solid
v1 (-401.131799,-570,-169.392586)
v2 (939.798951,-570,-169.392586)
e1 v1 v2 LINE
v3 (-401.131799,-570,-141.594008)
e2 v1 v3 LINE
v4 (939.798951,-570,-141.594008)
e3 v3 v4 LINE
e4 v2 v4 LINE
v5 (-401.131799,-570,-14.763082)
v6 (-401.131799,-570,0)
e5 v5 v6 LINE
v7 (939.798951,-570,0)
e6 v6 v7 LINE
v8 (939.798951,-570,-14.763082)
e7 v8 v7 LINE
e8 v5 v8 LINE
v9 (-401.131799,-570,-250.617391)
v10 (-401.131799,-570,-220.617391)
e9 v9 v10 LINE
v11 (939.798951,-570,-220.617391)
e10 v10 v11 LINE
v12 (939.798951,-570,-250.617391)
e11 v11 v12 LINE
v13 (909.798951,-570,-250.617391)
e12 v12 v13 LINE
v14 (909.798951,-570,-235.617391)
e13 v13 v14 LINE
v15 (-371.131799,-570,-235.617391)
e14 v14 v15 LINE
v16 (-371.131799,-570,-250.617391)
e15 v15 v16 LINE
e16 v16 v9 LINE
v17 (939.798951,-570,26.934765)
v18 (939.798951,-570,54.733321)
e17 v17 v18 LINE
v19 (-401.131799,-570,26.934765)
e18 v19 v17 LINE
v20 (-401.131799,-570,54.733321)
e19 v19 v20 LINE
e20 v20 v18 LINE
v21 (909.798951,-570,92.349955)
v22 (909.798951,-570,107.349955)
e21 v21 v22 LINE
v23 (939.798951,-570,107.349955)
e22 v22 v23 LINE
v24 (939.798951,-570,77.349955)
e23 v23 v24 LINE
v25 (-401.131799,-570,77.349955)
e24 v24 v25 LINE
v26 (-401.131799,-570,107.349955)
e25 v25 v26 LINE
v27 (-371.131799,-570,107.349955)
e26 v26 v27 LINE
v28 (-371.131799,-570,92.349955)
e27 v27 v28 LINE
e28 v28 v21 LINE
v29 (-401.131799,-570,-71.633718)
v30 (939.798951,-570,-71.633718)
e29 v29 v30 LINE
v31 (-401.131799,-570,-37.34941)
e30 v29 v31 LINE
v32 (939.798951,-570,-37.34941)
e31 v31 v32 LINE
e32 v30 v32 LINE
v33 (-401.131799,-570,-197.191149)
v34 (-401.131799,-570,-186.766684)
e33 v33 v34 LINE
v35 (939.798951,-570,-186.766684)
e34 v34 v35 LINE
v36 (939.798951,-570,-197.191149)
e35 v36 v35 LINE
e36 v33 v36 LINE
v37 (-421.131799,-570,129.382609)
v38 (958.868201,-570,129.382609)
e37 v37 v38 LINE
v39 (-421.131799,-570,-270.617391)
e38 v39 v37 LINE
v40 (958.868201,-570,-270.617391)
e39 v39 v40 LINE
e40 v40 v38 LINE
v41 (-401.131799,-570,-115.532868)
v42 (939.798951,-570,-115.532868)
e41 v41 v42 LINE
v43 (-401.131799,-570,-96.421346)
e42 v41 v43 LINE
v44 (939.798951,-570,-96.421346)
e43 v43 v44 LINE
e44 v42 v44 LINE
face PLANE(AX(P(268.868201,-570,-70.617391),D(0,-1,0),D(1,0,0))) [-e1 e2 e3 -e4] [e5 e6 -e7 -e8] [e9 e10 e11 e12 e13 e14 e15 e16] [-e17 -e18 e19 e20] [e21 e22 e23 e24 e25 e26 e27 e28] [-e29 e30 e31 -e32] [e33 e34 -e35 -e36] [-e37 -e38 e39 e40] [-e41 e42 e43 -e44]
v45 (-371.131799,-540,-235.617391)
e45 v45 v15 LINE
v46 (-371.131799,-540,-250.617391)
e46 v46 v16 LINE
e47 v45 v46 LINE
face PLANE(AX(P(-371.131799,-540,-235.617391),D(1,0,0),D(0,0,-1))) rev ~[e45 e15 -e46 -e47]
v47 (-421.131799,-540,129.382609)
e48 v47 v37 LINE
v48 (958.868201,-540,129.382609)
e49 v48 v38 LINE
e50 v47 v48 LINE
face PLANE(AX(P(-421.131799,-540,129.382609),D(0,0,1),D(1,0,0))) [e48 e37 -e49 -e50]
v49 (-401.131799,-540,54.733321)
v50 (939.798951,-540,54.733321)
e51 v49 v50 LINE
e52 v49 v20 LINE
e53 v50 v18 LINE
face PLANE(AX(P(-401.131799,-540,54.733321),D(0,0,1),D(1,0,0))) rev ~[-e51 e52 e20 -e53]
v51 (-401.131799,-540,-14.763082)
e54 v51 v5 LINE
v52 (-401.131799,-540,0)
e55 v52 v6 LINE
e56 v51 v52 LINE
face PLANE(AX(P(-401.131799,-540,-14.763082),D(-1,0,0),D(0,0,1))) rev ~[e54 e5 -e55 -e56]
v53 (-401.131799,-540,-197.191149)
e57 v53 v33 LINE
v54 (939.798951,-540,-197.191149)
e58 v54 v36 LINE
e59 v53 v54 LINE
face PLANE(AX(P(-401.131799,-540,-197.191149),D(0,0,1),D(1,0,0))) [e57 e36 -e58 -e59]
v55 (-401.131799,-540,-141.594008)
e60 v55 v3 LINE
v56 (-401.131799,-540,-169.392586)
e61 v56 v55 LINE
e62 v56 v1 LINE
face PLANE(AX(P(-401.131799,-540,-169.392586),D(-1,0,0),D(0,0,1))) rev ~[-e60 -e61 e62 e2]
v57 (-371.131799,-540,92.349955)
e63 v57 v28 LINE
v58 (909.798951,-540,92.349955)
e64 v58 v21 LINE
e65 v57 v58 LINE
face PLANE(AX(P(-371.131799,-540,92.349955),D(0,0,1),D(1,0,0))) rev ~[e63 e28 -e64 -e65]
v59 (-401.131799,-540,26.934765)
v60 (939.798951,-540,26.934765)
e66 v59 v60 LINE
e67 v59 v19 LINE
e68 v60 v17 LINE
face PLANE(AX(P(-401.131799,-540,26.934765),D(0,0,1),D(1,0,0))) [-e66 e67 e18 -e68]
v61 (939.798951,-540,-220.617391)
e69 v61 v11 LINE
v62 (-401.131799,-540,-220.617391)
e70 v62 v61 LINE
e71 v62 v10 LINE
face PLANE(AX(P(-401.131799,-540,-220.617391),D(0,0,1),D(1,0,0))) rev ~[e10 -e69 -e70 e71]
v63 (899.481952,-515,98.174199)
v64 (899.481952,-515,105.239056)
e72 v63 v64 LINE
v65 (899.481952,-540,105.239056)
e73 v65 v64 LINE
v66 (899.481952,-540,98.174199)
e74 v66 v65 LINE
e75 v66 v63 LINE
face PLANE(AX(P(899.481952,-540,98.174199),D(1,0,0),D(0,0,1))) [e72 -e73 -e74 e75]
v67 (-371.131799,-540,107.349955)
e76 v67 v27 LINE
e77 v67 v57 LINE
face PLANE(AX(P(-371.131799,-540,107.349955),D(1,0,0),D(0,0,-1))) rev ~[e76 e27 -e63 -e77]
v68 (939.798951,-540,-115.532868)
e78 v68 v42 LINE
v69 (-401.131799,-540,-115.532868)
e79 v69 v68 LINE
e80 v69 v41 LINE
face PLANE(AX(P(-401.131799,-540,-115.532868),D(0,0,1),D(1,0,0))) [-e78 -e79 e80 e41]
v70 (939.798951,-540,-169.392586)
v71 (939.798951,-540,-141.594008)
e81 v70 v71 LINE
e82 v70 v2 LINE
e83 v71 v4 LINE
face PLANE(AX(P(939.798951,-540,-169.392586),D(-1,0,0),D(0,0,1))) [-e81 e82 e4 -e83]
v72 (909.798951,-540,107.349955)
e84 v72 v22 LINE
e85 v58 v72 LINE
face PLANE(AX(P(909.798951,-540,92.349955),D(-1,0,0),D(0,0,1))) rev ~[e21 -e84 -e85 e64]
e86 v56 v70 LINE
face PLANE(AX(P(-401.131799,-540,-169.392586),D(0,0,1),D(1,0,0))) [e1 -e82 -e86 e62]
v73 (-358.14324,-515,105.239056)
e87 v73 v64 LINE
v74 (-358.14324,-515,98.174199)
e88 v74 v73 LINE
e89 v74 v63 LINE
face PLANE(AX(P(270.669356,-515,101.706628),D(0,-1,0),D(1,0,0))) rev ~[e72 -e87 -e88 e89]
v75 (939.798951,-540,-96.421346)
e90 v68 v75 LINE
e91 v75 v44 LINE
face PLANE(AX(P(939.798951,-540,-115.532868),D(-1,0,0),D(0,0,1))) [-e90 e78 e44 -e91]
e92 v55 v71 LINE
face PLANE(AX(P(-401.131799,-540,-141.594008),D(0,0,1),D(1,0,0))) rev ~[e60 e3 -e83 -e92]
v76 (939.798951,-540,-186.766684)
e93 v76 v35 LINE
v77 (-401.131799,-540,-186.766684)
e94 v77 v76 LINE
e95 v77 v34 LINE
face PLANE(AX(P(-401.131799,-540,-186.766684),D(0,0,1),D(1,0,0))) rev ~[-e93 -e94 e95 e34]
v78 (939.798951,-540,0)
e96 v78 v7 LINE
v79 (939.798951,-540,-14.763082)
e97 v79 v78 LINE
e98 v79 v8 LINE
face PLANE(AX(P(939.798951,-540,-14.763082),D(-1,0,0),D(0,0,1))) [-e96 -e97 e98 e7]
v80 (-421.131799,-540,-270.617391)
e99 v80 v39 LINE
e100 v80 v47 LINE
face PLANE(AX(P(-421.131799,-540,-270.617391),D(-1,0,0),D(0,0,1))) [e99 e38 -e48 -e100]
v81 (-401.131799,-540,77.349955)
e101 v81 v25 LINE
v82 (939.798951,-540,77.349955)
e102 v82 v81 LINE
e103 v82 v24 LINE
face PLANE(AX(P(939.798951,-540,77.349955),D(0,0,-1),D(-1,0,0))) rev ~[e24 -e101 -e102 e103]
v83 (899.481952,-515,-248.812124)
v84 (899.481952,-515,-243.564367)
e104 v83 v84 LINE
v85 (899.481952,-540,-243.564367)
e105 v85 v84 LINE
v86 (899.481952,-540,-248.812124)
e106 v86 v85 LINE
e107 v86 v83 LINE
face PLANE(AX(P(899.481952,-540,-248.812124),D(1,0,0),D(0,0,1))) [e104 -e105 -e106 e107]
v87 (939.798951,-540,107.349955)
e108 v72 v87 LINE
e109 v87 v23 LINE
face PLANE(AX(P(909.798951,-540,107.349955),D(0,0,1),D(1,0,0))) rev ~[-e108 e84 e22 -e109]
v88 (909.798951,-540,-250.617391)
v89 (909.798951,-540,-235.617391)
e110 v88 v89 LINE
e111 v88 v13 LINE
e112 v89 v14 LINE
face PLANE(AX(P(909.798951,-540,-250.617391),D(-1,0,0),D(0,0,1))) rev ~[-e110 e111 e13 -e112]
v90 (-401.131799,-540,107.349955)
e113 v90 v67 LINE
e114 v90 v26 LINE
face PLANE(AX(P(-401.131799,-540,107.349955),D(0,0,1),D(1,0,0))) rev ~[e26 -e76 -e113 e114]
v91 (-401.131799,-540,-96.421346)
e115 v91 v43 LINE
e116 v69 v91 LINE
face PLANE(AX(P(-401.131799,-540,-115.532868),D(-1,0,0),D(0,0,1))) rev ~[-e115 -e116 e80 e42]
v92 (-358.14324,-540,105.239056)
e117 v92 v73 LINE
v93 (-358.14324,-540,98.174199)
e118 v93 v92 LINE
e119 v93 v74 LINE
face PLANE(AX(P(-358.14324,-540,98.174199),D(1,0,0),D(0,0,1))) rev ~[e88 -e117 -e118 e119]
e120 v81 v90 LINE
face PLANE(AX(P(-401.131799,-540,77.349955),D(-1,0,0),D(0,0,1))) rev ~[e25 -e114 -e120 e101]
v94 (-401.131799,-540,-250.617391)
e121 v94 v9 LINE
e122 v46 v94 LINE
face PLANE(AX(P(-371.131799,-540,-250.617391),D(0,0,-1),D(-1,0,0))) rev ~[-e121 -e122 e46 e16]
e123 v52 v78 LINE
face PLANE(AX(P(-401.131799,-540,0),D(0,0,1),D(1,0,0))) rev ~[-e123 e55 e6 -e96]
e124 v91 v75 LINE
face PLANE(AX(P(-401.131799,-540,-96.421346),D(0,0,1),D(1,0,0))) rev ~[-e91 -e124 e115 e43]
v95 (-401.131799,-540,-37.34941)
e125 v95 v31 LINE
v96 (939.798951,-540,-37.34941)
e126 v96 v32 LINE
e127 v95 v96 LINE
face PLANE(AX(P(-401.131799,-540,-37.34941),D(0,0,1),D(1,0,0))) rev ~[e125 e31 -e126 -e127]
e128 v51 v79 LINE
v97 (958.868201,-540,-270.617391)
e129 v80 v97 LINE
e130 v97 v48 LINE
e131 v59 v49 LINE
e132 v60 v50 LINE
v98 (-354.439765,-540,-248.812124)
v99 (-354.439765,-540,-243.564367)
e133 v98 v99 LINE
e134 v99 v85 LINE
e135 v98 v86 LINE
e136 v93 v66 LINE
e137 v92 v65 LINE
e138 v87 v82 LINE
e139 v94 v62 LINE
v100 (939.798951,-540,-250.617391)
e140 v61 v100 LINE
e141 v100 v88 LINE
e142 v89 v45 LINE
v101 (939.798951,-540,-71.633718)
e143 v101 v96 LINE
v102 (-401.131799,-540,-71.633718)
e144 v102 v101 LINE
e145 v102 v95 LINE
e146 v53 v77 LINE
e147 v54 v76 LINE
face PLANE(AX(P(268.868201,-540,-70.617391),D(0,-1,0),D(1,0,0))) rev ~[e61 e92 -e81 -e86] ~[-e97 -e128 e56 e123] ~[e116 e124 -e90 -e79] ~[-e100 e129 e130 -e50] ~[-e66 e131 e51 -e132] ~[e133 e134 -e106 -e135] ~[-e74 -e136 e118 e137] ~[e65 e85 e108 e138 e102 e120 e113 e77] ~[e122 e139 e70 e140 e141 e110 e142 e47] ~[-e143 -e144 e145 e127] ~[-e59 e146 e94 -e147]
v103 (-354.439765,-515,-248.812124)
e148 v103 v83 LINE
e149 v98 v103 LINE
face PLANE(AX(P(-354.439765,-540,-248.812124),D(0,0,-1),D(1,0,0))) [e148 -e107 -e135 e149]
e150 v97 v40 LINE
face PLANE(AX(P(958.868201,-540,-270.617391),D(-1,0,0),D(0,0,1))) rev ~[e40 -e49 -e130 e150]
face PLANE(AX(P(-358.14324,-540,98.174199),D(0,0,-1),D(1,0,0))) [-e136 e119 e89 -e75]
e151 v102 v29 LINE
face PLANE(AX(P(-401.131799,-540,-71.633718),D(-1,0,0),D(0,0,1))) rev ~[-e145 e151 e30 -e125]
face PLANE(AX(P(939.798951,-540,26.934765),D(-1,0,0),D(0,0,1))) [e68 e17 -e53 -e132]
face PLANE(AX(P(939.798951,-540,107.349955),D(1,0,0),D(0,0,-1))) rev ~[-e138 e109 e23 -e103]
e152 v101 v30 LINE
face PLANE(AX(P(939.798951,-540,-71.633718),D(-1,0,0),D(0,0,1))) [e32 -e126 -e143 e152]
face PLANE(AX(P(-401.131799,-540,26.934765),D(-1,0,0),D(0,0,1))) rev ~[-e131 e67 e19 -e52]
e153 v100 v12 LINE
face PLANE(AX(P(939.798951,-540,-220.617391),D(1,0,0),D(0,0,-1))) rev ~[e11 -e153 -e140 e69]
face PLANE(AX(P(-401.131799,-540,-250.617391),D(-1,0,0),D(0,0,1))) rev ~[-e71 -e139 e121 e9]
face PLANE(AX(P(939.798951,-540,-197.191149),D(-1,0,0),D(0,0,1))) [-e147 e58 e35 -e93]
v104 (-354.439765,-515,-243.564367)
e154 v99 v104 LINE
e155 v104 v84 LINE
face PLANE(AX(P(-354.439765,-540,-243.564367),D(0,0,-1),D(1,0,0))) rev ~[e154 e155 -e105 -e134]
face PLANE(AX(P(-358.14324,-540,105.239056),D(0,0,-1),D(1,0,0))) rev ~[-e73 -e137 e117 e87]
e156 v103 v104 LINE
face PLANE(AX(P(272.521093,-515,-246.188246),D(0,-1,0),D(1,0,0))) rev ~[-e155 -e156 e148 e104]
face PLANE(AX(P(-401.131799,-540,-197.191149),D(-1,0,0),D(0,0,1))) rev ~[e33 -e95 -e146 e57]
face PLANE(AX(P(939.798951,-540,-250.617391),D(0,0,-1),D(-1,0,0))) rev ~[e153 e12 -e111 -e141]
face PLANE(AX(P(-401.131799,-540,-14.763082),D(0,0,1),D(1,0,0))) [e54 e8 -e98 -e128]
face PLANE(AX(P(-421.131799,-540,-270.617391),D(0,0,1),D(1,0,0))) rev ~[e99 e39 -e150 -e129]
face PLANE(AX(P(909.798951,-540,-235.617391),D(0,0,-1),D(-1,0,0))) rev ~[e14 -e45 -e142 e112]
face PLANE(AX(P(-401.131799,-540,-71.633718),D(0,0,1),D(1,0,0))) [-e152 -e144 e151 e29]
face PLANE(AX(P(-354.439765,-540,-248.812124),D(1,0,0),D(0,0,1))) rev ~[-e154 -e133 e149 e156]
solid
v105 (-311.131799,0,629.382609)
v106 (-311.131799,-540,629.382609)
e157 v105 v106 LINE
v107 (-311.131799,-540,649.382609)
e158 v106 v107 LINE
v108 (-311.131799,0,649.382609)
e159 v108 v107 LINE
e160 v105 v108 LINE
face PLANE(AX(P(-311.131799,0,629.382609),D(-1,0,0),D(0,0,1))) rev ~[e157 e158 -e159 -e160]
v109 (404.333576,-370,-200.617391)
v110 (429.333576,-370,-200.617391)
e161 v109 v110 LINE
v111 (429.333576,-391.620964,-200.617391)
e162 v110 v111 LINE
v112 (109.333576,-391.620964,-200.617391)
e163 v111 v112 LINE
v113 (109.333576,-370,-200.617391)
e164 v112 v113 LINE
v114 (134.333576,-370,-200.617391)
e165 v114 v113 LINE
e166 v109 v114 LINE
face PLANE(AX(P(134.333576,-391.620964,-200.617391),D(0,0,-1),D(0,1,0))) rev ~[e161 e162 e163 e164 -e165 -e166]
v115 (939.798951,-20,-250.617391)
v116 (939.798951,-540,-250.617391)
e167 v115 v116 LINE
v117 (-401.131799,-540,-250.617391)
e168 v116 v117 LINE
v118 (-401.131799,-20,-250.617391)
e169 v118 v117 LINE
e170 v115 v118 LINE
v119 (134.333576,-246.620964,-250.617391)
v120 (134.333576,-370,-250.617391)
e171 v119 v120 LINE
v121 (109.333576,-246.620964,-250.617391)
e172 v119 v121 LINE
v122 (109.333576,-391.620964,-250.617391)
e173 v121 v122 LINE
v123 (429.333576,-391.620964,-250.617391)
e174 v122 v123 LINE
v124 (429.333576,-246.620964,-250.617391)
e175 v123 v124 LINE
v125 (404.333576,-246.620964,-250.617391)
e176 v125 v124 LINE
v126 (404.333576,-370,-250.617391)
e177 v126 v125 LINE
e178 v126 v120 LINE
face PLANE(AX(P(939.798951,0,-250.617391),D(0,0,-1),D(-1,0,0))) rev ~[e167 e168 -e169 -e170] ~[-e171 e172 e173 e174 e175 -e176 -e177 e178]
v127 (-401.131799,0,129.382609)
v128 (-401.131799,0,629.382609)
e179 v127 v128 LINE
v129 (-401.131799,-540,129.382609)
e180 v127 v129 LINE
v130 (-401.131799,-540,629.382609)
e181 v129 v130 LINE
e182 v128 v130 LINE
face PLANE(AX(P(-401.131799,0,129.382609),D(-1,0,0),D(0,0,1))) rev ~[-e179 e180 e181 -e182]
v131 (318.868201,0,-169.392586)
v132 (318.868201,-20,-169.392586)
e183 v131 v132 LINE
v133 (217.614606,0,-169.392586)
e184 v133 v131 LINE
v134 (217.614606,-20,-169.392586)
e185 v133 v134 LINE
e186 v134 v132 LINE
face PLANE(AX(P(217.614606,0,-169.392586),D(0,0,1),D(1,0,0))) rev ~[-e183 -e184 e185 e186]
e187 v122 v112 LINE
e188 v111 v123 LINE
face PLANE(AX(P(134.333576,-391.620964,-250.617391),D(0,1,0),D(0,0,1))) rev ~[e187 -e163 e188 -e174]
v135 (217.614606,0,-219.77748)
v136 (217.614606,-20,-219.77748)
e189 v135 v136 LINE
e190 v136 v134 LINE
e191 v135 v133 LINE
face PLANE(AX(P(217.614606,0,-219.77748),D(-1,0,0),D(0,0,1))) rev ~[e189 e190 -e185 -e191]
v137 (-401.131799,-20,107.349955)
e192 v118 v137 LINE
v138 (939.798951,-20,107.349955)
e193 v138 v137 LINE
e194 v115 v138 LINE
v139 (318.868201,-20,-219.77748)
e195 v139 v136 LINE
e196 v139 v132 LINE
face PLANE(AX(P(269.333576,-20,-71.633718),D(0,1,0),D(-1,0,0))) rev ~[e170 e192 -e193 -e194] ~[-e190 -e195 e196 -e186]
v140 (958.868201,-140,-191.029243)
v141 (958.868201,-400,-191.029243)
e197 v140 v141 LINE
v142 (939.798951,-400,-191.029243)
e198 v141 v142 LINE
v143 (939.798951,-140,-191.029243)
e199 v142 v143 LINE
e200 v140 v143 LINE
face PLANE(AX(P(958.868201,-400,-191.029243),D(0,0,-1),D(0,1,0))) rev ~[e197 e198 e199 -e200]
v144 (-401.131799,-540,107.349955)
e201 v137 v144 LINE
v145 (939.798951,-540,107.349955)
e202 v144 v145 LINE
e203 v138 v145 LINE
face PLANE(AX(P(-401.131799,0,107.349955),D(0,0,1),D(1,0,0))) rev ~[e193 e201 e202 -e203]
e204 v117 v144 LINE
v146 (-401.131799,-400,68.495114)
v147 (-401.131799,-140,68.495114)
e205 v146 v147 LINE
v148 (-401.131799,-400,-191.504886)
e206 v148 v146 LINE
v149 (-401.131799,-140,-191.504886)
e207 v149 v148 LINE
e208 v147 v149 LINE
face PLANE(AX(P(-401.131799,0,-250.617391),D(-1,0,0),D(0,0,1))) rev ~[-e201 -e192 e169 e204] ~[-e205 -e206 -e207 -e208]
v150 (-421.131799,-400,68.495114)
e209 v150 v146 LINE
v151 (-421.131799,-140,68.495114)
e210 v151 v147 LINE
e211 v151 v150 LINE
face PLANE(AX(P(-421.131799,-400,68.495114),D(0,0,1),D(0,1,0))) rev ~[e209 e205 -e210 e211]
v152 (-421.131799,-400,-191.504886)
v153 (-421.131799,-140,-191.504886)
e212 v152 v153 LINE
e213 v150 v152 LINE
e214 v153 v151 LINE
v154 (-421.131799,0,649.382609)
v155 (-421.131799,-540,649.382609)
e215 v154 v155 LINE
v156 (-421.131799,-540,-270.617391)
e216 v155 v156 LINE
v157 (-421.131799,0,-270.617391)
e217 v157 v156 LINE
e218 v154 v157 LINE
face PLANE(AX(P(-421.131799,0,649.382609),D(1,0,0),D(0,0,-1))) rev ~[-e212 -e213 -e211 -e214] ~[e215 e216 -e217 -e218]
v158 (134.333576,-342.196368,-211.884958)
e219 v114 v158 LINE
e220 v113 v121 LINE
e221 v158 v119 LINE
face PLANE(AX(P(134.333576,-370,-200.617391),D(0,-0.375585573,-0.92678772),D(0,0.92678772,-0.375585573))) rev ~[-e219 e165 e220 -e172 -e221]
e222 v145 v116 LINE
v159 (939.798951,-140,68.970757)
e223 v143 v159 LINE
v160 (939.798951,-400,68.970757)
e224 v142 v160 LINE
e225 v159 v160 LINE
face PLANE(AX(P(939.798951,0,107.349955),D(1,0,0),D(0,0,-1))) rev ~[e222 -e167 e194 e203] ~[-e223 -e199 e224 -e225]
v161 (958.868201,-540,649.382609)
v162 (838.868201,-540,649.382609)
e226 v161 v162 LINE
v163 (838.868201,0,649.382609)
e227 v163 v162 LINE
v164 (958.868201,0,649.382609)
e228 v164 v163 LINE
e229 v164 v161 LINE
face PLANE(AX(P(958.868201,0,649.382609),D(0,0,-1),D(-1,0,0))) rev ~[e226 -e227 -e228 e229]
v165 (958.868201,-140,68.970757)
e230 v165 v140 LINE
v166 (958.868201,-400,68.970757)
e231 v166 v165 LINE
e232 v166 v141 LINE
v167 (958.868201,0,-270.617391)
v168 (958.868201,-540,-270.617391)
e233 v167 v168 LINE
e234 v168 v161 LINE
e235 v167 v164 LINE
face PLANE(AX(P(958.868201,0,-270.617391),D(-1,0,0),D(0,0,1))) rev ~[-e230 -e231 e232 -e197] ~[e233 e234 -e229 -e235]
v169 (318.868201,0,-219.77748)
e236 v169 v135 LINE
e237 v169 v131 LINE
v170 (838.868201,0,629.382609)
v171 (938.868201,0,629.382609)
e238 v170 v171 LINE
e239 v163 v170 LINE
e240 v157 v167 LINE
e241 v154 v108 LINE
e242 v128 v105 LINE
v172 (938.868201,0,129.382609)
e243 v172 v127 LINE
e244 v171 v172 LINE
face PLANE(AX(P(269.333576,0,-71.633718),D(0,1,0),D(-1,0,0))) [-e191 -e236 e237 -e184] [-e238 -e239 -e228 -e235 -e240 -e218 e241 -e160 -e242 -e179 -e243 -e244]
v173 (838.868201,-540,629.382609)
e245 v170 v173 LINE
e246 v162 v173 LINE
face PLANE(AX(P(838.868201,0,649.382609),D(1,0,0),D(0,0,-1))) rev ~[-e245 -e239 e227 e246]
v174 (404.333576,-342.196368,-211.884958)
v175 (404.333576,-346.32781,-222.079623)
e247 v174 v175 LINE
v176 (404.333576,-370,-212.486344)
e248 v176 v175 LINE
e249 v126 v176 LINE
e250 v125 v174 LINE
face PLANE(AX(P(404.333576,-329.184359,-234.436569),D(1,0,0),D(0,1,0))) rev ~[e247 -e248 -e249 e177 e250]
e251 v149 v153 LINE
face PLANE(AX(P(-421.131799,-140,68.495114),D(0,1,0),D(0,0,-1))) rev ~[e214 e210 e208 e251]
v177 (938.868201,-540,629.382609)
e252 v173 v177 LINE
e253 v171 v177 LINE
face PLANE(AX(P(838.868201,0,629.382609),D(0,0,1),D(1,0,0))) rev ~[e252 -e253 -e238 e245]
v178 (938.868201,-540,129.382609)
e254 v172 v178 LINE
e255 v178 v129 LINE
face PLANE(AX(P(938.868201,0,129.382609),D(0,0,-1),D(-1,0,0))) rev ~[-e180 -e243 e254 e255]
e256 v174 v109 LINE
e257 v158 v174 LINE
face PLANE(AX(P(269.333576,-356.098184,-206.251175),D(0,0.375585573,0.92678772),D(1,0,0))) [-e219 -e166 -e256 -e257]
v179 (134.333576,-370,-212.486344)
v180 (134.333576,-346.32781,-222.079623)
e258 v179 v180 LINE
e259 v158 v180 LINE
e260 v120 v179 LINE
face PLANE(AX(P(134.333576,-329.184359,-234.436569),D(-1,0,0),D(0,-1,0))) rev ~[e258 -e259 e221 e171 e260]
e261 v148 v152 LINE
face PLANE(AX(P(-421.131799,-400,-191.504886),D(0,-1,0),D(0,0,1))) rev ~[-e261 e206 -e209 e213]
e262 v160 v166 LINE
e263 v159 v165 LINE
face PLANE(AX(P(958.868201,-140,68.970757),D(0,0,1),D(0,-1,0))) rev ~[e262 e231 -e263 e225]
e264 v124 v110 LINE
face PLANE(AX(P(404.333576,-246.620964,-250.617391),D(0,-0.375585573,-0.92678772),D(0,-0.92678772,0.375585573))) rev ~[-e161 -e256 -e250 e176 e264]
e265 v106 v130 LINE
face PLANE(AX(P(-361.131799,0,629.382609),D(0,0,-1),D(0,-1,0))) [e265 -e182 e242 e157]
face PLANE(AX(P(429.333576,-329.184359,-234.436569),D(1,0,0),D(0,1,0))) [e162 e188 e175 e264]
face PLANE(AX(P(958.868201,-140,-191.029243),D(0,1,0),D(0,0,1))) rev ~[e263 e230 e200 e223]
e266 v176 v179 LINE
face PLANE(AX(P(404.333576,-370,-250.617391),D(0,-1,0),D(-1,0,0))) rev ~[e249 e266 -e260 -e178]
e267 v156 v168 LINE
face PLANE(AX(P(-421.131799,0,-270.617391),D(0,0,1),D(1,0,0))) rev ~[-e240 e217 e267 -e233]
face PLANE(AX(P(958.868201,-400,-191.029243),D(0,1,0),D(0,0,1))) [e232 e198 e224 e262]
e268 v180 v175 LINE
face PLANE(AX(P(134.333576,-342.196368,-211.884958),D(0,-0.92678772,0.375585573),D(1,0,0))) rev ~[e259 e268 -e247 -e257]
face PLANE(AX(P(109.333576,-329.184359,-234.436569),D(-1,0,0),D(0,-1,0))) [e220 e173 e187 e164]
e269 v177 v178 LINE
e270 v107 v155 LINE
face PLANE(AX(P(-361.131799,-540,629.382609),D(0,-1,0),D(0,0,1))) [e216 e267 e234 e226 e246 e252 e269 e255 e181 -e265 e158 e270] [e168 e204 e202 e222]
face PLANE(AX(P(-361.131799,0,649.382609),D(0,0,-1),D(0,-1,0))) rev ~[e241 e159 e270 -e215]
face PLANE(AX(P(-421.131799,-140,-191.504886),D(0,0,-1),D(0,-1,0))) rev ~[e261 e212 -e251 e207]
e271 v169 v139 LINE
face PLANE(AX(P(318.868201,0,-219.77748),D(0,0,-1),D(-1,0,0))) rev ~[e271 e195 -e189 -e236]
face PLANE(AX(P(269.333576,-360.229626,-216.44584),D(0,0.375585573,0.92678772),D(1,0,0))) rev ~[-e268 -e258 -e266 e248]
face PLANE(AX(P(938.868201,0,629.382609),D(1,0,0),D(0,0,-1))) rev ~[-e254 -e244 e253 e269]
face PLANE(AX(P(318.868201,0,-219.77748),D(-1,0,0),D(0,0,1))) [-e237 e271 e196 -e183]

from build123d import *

# Parameters (mm, degrees)
F1_DEPTH  = 540
F2_W      = 130
F2_H      = 130
F3_DEPTH  = 41.5
F5_W      = 130
F5_H      = 260
F6_DEPTH  = 250
F8_DEPTH  = 50
F9_W      = 1380
F9_H      = 400
F9_W_2    = 1340.93075037
F9_H_2    = 10.424464941
F9_H_3    = 27.7985781431
F9_H_4    = 19.1115215421
F9_H_5    = 34.2843079742
F9_H_6    = 14.7630823776
F9_H_7    = 27.7985557914
F11_DEPTH = 30
F10_W     = 1253.9217174053
F10_H     = 5.2477568388
F10_W_2   = 1257.6251924038
F10_H_2   = 7.0648565888
F12_DEPTH = 25
F13_W     = 1340.93075037
F13_H     = 357.9673457496
F14_DEPTH = 20
F16_DEPTH = 50
F18_DEPTH = 25
F20_DEPTH = 25
F21_W     = 270
F21_H     = 30
F22_DEPTH = 11
F23_W     = 50
F23_H     = 50.3848940134
F24_DEPTH = 60


# Not quite as in the source:
# - a feature names something its author has since deleted; it is built from what else it names


with BuildPart() as f1:
    # F0 (on Front) → F1 (new body)
    with BuildSketch(Plane.XZ):
        Polygon((-401.131799221, 210.1073265076), (-401.131799221, 629.3826087959), (-361.131799221, 629.3826087959), (-361.131799221, 649.3826087959), (-421.131799221, 649.3826087959), (-421.131799221, -270.6173912041), (958.868200779, -270.6173912041), (958.868200779, 649.3826087959), (838.868200779, 649.3826087959), (838.868200779, 629.3826087959), (938.868200779, 629.3826087959), (938.868200779, 210.1073265076), (938.868200779, 129.3826087959), (-401.131799221, 129.3826087959), align=None)
        Polygon((938.868200779, -250.6173912041), (-401.131799221, -250.6173912041), (-401.131799221, 107.3499545455), (939.798951149, 107.3499545455), (939.798951149, -250.6173912041), align=None, mode=Mode.SUBTRACT)
    extrude(amount=F1_DEPTH)


with BuildPart() as f3:
    # F2 (on face) → F3 (new body, symmetric)
    with BuildSketch(Plane(origin=(-421.131799221, 0, 0), x_dir=(0, -1, 0), z_dir=(-1, 0, 0))):
        with Locations((205, 3.4951143172)):
            Rectangle(F2_W, F2_H)
        with Locations((335, 3.4951143172)):
            Rectangle(F2_W, F2_H)
        with Locations((335, -126.5048856828)):
            Rectangle(F2_W, F2_H)
        with Locations((205, -126.5048856828)):
            Rectangle(F2_W, F2_H)
    extrude(amount=F3_DEPTH, both=True)


with BuildPart() as f1_1:
    add(f1.part)

    # F4: cut F3
    add(f3.part, mode=Mode.SUBTRACT)


with BuildPart() as f6:
    # F5 (on face) → F6 (new body, symmetric)
    with BuildSketch(Plane.YZ.offset(958.868200779)):
        with Locations((-205, -61.0292432997)):
            Rectangle(F5_W, F5_H)
        with Locations((-335, -61.0292432997)):
            Rectangle(F5_W, F5_H)
    extrude(amount=F6_DEPTH, both=True)


with BuildPart() as f1_2:
    add(f1_1.part)

    # F7: cut F6
    add(f6.part, mode=Mode.SUBTRACT)

    # F8 (add): a face of the model
    f8_faces = [f1_2.faces().sort_by_distance(p)[0] for p in [
        (-361.131799221, -270, 639.3826087959),
    ]]
    extrude(f8_faces, amount=F8_DEPTH)

    # F13 (on face) → F14 (join)
    with BuildSketch(Plane(origin=(0, 0, 0), x_dir=(-1, 0, 0), z_dir=(0, 1, 0))):
        with Locations((-269.333575964, -71.6337183293)):
            Rectangle(F13_W, F13_H)
    extrude(amount=-F14_DEPTH)

    # F15 (on face) → F16 (join)
    with BuildSketch(Plane.XY.offset(-250.6173912041)):
        Polygon((404.333575964, -370), (269.333575964, -370), (134.333575964, -370), (134.333575964, -391.6209638119), (210.3650718927, -391.6209638119), (269.333575964, -391.6209638119), (404.333575964, -391.6209638119), align=None)
    extrude(amount=F16_DEPTH)

    # F17 (on face) → F18 (join)
    with BuildSketch(Plane.YZ.offset(404.333575964)):
        Polygon((-391.6209638119, -200.6173912041), (-391.6209638119, -250.6173912041), (-246.6209638119, -250.6173912041), (-370, -200.6173912041), align=None)
    extrude(amount=F18_DEPTH)

    # F19 (on face) → F20 (join)
    with BuildSketch(Plane(origin=(134.333575964, 0, 0), x_dir=(0, -1, 0), z_dir=(-1, 0, 0))):
        Polygon((246.6209638119, -250.6173912041), (391.6209638119, -250.6173912041), (391.6209638119, -200.6173912041), (370, -200.6173912041), align=None)
    extrude(amount=F20_DEPTH)

    # F21 (on face) → F22 (join)
    with BuildSketch(Plane(origin=(0, -122.0263992007, -301.1099904579), x_dir=(1, 0, 0), z_dir=(0, 0.3755855729, 0.9267877197))):
        with Locations((269.333575964, -252.5624584992)):
            Rectangle(F21_W, F21_H)
    extrude(amount=-F22_DEPTH)


with BuildPart() as f11:
    # F9 (on face) → F11 (new body)
    with BuildSketch(Plane.XZ.offset(540)):
        with Locations((268.868200779, -70.6173912041)):
            Rectangle(F9_W, F9_H)
        Polygon((-371.131799221, -250.6173912041), (-401.131799221, -250.6173912041), (-401.131799221, -220.6173912041), (-371.131799221, -220.6173912041), (909.798951149, -220.6173912041), (939.798951149, -220.6173912041), (939.798951149, -250.6173912041), (909.798951149, -250.6173912041), (909.798951149, -235.6173912041), (-371.131799221, -235.6173912041), align=None, mode=Mode.SUBTRACT)
        with Locations((269.333575964, -191.9789165258)):
            Rectangle(F9_W_2, F9_H_2, mode=Mode.SUBTRACT)
        with Locations((269.333575964, -155.4932966828)):
            Rectangle(F9_W_2, F9_H_3, mode=Mode.SUBTRACT)
        with Locations((269.333575964, -105.9771068394)):
            Rectangle(F9_W_2, F9_H_4, mode=Mode.SUBTRACT)
        with Locations((269.333575964, -54.4915643422)):
            Rectangle(F9_W_2, F9_H_5, mode=Mode.SUBTRACT)
        with Locations((269.333575964, -7.3815411888)):
            Rectangle(F9_W_2, F9_H_6, mode=Mode.SUBTRACT)
        with Locations((269.333575964, 40.834043175)):
            Rectangle(F9_W_2, F9_H_7, mode=Mode.SUBTRACT)
        Polygon((-401.131799221, 77.3499545455), (-401.131799221, 107.3499545455), (-371.131799221, 107.3499545455), (-371.131799221, 92.3499545455), (-364.3079102039, 92.3499545455), (909.798951149, 92.3499545455), (909.798951149, 107.3499545455), (939.798951149, 107.3499545455), (939.798951149, 77.3499545455), (909.798951149, 77.3499545455), (-364.3079102039, 77.3499545455), (-371.131799221, 77.3499545455), align=None, mode=Mode.SUBTRACT)
    extrude(amount=F11_DEPTH)

    # F10 (on face) → F12 (join)
    with BuildSketch(Plane.XZ.offset(540)):
        with Locations((272.5210934877, -246.1882457137)):
            Rectangle(F10_W, F10_H)
        with Locations((270.6693559885, 101.7066277564)):
            Rectangle(F10_W_2, F10_H_2)
    extrude(amount=-F12_DEPTH)


with BuildPart() as f24:
    # F23 (on face) → F24 (new body)
    with BuildSketch(Plane(origin=(0, 0, 0), x_dir=(-1, 0, 0), z_dir=(0, 1, 0))):
        Polygon((-268.868200779, -169.3925857544), (-268.868200779, -219.7774797678), (-218.868200779, -219.7774797678), (-217.6146060228, -219.7774797678), (-217.6146060228, -169.3925857544), align=None)
        with Locations((-293.868200779, -194.5850327611)):
            Rectangle(F23_W, F23_H)
    extrude(amount=-F24_DEPTH)


with BuildPart() as f1_3:
    add(f1_2.part)

    # F25: cut F24
    add(f24.part, mode=Mode.SUBTRACT)


solid = Compound([f11.part, f1_3.part])
